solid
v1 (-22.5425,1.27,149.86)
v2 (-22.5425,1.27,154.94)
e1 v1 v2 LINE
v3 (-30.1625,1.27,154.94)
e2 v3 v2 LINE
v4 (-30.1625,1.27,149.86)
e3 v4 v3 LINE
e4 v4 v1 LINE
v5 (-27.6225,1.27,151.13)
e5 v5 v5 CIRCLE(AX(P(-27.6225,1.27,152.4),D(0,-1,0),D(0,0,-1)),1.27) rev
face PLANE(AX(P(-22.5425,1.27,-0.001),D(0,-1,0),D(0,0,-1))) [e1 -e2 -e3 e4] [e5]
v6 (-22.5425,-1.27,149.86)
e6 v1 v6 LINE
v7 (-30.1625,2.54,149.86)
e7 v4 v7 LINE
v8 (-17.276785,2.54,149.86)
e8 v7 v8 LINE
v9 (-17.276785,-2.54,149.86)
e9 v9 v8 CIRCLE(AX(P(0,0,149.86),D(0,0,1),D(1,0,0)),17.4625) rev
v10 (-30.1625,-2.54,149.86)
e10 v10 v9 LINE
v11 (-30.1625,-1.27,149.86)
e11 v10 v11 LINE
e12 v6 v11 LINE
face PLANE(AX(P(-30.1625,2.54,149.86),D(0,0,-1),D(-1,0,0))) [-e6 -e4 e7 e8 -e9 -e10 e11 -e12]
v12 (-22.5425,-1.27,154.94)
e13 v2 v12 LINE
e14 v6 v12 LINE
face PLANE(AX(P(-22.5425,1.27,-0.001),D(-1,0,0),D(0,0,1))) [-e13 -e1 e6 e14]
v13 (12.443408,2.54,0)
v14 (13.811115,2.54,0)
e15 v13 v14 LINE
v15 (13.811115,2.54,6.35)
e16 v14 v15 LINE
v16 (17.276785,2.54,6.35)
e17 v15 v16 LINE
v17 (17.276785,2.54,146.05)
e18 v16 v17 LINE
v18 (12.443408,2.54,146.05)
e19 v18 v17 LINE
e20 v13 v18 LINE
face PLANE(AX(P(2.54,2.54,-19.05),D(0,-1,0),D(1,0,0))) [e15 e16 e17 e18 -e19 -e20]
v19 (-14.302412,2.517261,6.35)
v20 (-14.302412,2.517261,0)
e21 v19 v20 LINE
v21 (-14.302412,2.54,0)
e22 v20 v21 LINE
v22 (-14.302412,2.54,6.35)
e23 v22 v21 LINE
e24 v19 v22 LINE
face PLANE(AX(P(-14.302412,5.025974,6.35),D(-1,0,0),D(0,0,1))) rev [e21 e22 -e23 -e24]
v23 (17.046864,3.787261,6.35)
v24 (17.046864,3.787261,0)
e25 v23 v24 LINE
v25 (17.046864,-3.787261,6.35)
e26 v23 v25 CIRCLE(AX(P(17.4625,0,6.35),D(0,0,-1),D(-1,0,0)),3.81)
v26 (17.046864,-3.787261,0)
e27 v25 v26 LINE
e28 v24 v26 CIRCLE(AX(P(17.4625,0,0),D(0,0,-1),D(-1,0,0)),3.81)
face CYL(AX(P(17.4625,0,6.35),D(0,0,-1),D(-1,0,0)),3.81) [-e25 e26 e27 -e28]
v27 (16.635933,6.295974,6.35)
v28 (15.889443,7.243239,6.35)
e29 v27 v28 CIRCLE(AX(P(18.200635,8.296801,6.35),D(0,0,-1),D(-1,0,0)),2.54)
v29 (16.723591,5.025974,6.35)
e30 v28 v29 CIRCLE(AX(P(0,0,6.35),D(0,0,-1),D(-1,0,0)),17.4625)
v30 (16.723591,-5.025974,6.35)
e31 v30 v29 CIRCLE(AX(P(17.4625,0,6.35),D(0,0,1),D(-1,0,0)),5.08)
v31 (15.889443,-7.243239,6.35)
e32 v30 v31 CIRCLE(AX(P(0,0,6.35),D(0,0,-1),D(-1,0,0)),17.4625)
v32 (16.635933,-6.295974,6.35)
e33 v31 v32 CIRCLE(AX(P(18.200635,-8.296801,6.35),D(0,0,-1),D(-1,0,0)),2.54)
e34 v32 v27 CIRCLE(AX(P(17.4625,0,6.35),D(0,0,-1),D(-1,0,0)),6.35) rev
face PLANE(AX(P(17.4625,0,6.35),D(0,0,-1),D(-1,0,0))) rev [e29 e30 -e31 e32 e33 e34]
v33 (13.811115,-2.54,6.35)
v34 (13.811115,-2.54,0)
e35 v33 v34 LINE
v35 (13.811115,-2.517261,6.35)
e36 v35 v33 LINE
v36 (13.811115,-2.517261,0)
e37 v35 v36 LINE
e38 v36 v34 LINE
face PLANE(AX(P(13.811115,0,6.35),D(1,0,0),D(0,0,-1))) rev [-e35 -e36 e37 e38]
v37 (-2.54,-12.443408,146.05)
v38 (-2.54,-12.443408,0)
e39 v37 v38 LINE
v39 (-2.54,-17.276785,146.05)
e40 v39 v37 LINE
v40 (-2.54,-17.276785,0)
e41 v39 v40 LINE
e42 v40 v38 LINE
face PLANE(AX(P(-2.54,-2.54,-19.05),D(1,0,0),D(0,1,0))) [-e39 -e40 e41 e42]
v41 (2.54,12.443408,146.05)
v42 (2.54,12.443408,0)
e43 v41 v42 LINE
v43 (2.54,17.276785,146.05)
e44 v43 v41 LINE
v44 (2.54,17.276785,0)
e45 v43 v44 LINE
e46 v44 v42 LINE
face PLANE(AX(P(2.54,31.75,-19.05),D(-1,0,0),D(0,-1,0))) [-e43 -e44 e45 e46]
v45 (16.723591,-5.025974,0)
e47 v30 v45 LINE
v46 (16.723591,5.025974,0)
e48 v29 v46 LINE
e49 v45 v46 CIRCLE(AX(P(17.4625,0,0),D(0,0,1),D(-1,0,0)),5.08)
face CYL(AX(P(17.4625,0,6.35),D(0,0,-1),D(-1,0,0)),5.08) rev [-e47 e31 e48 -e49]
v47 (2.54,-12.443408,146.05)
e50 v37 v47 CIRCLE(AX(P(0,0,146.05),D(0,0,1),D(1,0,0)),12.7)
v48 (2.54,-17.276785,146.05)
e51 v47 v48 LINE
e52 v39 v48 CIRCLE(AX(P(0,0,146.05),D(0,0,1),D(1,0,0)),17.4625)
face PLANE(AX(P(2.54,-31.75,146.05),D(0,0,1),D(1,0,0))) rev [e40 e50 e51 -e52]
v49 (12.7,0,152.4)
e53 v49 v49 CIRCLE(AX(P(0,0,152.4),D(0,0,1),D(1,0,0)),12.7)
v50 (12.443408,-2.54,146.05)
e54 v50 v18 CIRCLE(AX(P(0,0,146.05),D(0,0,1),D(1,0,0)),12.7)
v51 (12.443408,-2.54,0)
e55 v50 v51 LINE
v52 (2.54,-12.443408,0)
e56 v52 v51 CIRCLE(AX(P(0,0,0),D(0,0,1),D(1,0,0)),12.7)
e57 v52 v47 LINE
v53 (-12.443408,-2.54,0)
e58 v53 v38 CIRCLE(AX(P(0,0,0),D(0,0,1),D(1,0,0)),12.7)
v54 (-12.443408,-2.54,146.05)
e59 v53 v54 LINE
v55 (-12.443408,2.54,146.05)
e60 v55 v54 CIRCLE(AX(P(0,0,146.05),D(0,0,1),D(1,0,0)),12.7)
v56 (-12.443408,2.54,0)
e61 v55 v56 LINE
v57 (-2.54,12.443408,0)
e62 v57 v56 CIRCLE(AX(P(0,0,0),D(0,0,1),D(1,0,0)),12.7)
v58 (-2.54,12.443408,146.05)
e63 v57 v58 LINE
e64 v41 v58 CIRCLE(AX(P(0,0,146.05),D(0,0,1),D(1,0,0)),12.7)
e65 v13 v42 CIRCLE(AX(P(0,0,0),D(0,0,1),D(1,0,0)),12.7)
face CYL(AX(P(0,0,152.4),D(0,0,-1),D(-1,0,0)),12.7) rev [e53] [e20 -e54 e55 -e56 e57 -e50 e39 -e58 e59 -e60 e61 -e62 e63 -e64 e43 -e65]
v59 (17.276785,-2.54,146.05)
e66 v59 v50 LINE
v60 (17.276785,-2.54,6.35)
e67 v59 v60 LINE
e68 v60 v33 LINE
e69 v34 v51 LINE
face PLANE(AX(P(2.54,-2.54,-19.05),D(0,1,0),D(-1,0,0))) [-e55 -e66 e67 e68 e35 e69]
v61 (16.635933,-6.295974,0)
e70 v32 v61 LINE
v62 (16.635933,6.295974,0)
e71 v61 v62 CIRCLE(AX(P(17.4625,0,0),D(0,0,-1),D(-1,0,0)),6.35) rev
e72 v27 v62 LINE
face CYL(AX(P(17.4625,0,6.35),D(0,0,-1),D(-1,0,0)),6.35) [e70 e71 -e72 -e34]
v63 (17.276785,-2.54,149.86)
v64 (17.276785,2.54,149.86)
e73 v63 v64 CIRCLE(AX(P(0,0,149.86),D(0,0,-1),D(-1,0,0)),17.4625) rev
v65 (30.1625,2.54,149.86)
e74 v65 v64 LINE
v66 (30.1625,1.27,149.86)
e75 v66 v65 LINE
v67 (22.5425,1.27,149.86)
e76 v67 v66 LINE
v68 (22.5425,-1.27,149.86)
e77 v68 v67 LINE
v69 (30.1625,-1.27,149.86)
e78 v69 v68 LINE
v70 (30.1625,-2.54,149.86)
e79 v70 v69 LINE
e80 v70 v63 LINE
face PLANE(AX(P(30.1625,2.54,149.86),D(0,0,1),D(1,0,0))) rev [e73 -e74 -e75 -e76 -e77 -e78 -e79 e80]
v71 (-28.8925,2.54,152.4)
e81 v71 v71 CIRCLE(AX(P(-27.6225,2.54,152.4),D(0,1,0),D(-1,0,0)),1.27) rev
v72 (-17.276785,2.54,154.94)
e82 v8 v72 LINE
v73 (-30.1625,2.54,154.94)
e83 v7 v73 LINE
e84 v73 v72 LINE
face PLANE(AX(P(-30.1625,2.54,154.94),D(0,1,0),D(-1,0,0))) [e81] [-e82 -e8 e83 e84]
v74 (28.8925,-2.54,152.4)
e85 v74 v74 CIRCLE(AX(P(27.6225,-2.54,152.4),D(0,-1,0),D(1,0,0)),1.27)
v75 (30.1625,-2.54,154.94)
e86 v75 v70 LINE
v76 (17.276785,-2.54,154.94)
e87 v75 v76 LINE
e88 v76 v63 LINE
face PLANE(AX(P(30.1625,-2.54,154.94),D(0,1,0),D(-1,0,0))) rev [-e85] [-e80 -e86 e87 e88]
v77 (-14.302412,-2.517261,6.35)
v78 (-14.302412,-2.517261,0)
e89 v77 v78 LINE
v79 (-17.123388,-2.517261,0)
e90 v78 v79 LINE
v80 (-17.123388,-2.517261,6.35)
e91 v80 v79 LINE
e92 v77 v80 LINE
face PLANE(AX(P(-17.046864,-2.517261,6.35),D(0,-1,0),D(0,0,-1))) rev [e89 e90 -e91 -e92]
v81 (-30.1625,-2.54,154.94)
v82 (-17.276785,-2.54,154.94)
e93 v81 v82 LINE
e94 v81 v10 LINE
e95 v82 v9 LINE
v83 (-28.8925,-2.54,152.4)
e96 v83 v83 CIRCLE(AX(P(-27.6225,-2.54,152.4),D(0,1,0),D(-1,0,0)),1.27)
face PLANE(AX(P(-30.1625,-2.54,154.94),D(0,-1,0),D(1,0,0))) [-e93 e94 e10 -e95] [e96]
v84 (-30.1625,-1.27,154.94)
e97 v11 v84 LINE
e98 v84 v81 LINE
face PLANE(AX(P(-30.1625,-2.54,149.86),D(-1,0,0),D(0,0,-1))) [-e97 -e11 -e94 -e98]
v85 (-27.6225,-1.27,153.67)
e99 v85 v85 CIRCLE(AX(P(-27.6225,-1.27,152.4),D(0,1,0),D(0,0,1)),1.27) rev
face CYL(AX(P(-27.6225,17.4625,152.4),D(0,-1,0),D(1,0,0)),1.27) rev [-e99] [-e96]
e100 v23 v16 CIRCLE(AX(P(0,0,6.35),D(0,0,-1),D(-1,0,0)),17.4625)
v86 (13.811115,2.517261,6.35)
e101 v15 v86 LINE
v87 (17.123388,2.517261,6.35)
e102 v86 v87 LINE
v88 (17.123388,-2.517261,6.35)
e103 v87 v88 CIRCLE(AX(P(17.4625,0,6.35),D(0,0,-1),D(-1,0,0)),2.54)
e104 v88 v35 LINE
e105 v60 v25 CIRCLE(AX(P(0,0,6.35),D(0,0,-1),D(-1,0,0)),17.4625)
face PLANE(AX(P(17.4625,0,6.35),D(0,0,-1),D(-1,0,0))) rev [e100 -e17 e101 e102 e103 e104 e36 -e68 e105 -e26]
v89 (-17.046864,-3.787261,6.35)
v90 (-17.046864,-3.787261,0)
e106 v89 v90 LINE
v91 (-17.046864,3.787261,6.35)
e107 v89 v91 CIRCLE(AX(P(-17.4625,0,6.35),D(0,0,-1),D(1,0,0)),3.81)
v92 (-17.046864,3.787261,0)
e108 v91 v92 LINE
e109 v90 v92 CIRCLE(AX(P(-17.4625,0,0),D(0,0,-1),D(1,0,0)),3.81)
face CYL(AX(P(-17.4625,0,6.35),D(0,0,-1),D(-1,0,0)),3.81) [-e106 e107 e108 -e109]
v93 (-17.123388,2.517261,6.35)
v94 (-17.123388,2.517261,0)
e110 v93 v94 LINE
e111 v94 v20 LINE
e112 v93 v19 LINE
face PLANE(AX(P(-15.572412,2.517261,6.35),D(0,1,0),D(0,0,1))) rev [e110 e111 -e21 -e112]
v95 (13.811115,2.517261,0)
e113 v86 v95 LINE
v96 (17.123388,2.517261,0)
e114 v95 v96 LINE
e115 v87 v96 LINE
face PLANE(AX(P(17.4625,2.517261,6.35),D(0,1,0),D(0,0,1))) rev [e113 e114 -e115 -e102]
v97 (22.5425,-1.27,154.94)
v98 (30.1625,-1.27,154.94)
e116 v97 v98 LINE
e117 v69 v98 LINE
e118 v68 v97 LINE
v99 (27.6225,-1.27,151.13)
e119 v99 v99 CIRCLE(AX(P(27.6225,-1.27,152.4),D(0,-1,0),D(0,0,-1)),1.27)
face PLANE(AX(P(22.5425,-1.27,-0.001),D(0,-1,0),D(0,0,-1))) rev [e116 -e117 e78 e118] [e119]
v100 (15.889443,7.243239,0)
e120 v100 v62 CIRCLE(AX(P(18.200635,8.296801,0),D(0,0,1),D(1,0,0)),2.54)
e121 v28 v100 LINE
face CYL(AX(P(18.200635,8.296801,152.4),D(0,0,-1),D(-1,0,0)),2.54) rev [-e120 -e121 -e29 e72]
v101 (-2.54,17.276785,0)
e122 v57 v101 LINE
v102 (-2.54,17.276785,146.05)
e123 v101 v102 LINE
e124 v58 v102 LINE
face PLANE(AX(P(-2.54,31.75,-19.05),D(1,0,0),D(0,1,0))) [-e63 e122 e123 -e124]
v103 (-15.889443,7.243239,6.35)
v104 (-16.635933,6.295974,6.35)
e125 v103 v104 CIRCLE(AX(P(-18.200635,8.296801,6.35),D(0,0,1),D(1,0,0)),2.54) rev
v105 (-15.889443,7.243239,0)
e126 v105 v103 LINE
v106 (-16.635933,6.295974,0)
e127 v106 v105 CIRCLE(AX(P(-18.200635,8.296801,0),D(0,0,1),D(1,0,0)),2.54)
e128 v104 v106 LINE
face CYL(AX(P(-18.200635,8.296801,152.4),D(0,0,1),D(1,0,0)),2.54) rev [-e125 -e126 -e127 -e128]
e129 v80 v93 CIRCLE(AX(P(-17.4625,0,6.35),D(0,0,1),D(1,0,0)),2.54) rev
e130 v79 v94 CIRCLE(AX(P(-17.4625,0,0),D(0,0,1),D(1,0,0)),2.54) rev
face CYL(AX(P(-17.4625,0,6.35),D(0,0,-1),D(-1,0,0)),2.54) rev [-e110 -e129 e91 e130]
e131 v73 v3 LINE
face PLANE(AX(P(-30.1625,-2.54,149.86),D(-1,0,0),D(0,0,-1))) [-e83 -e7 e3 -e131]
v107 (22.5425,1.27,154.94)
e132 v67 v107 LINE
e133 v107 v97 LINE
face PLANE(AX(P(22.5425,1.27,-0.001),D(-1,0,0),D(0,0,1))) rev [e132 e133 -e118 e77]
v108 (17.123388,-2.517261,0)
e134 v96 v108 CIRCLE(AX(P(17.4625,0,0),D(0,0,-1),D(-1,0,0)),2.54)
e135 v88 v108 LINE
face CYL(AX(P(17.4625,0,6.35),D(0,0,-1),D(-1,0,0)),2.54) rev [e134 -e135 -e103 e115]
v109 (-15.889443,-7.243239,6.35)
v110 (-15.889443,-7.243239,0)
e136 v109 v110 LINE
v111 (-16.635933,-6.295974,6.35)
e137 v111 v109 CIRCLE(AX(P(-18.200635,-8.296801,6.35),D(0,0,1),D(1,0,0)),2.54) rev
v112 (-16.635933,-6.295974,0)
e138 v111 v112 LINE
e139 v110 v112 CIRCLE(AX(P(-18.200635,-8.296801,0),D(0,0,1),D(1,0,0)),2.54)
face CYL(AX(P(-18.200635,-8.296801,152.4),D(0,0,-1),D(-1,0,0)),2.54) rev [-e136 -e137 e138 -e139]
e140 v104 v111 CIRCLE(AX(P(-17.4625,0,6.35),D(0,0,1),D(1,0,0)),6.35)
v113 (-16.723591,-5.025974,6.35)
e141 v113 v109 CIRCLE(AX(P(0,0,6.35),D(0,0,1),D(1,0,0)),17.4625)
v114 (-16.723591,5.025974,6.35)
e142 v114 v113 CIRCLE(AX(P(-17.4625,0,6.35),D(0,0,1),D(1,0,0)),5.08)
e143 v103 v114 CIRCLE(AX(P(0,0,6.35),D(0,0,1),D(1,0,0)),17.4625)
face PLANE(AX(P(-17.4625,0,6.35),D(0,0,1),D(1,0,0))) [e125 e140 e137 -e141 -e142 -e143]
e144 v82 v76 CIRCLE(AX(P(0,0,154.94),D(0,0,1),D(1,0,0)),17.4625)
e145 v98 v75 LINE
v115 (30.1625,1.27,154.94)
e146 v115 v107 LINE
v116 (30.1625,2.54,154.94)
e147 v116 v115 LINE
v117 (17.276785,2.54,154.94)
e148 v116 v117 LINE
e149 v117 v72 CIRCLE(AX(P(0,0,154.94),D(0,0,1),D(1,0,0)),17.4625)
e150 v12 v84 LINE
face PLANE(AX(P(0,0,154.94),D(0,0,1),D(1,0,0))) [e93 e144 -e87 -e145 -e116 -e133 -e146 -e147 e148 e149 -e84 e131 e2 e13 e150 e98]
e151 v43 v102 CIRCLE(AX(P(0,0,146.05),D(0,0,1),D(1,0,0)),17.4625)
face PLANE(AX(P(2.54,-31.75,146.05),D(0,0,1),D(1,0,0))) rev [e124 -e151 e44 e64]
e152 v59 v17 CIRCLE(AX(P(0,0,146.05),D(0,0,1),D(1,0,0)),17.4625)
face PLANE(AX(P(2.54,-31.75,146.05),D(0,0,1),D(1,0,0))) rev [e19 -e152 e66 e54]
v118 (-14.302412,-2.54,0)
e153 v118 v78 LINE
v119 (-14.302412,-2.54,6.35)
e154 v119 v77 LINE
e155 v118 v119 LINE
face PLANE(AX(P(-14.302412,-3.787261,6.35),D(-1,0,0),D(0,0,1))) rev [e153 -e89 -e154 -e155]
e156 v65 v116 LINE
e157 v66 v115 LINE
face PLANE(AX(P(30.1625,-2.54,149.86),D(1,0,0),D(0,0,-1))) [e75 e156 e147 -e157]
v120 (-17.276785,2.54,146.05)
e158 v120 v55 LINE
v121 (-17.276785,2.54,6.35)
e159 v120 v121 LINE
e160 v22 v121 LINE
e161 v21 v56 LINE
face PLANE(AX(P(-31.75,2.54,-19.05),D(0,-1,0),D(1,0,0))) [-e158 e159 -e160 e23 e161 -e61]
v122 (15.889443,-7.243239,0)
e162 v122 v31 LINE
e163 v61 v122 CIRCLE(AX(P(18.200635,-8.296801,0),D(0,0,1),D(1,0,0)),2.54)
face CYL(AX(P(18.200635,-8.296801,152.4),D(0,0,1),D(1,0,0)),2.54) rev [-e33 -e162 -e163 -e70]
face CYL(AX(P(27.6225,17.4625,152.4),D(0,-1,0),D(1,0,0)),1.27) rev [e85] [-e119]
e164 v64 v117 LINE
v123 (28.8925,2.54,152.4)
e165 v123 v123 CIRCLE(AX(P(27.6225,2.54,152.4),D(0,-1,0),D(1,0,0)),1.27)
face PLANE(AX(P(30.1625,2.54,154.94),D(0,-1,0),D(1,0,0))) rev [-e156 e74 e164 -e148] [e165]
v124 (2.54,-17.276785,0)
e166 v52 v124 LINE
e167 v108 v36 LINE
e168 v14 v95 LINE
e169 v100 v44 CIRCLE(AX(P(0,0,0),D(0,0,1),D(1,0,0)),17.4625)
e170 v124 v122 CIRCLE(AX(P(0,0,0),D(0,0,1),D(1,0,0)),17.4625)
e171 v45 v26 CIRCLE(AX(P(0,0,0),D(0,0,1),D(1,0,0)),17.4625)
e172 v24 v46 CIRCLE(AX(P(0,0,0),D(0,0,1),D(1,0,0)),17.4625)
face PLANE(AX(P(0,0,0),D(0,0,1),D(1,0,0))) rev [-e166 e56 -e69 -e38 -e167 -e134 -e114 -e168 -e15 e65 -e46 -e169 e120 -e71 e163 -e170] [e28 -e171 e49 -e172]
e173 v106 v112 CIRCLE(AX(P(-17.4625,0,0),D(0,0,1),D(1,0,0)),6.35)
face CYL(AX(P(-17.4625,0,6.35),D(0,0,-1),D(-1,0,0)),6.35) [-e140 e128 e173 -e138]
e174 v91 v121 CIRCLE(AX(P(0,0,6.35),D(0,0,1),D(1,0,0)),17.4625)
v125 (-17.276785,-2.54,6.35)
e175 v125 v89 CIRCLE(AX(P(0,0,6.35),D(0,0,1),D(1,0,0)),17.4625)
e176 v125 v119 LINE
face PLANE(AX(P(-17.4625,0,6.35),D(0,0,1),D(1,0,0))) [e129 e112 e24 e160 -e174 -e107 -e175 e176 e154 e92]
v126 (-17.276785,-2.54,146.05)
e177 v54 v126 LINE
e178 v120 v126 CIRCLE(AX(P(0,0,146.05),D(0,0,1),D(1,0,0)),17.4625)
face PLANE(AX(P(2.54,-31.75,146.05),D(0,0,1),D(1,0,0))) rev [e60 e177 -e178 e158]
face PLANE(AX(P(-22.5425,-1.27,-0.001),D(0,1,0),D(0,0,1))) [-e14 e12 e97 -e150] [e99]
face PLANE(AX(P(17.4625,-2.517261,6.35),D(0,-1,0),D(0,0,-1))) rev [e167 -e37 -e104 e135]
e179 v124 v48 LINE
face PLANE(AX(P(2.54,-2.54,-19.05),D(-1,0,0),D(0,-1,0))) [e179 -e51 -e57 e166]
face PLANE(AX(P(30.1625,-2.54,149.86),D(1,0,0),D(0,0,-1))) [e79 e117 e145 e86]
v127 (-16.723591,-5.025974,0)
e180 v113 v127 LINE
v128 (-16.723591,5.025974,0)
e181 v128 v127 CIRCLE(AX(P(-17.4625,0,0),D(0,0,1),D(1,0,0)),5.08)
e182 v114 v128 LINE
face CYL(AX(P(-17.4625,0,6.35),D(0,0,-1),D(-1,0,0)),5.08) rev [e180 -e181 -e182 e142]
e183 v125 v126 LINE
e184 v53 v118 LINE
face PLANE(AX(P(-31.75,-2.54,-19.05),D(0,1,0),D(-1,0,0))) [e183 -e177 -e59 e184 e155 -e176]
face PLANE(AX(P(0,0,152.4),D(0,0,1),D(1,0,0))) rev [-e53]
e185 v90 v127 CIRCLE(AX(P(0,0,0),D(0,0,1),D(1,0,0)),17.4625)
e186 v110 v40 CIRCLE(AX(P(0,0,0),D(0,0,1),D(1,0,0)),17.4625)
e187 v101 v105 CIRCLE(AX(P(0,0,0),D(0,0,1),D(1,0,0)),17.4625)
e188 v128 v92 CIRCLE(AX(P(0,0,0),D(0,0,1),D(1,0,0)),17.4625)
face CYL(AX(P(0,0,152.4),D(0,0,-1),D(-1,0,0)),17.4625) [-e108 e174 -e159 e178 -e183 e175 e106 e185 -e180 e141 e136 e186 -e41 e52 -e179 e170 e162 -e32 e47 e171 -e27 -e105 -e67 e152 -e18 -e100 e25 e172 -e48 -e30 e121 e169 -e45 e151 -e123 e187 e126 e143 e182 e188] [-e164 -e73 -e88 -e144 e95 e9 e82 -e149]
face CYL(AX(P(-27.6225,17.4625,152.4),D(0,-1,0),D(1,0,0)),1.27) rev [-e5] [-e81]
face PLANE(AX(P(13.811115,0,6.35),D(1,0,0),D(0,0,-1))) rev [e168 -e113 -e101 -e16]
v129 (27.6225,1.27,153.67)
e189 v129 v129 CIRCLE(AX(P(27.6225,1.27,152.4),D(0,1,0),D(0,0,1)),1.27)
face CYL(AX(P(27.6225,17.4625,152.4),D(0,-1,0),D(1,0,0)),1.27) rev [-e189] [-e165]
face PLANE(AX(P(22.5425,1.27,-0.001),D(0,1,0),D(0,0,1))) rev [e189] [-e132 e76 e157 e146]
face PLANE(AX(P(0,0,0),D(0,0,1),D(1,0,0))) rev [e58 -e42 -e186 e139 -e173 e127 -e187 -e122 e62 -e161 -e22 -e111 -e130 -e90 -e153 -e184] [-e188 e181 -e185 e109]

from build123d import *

# Parameters (mm, degrees)
SKETCH1_R               = 17.4625
SKETCH1_R_2             = 12.7
EXTRUDE_THIN1_DEPTH     = 152.4
CUT_EXTRUDE1_DEPTH      = 25.4
CUT_EXTRUDE1_DEPTH_BACK = 139.7
EXTRUDE_THIN2_DEPTH     = 6.35
SKETCH4_R               = 17.4625
BOSS_EXTRUDE1_DEPTH     = 2.54
FILLET1_R               = 2.54
BOSS_EXTRUDE2_START     = -0.185715
SKETCH5_W               = 5.08
SKETCH5_H               = 5.08
BOSS_EXTRUDE2_DEPTH     = 12.885715
CUT_EXTRUDE2_REACH      = 160.812
SKETCH6_W               = 7.62
SKETCH6_H               = 2.54
SKETCH7_R               = 1.27
CUT_EXTRUDE3_DEPTH      = 160.110904757


# Read off the part's stored shape, not the designer's step: Extrude-Thin2
with BuildPart() as part:
    # Sketch1 → Extrude-Thin1 (new body)
    with BuildSketch(Plane.XY):
        Circle(SKETCH1_R)
        Circle(SKETCH1_R_2, mode=Mode.SUBTRACT)
    extrude(amount=EXTRUDE_THIN1_DEPTH)

    # Sketch2 → Cut-Extrude1 (cut, two sides: drawn at the far end of the back side and taken through both)
    with BuildSketch(Plane(origin=(0, 0, 6.35), x_dir=(-1, 0, 0), z_dir=(0, 0, -1)).offset(-CUT_EXTRUDE1_DEPTH_BACK)):
        Polygon((-2.54, 2.54), (-31.75, 2.54), (-31.75, -2.54), (-2.54, -2.54), (-2.54, -31.75), (2.54, -31.75), (2.54, -2.54), (31.75, -2.54), (31.75, 2.54), (2.54, 2.54), (2.54, 31.75), (-2.54, 31.75), align=None)
    extrude(amount=CUT_EXTRUDE1_DEPTH + CUT_EXTRUDE1_DEPTH_BACK, mode=Mode.SUBTRACT)

    # Extrude-Thin2 outline → Extrude-Thin2 (add)
    with BuildSketch(Plane.XY):
        with BuildLine():
            Line((13.81111464, 2.51726107), (17.123388359, 2.51726107))
            ThreePointArc((17.123388359, 2.51726107), (20.0025, 0), (17.123388359, -2.51726107))
            Line((17.123388359, -2.51726107), (13.81111464, -2.51726107))
            Line((13.81111464, -2.51726107), (13.81111464, -2.54))
            Line((13.81111464, -2.54), (17.276785183, -2.54))
            ThreePointArc((17.276785183, -2.54), (17.17315149, -3.165718582), (17.046863636, -3.78726107))
            ThreePointArc((17.046863636, -3.78726107), (21.2725, 0), (17.046863636, 3.78726107))
            ThreePointArc((17.046863636, 3.78726107), (17.17315149, 3.165718582), (17.276785183, 2.54))
            Line((17.276785183, 2.54), (13.81111464, 2.54))
            Line((13.81111464, 2.54), (13.81111464, 2.51726107))
        make_face()
        with BuildLine():
            ThreePointArc((16.288020729, 6.295973871), (16.518015944, 5.665161561), (16.723590909, 5.025973871))
            ThreePointArc((16.723590909, 5.025973871), (22.5425, 0), (16.723590909, -5.025973871))
            ThreePointArc((16.723590909, -5.025973871), (16.518015944, -5.665161561), (16.288020729, -6.295973871))
            Line((16.288020729, -6.295973871), (16.635932996, -6.295973871))
            ThreePointArc((16.635932996, -6.295973871), (23.8125, 0), (16.635932996, 6.295973871))
            Line((16.635932996, 6.295973871), (16.288020729, 6.295973871))
        make_face()
        with BuildLine():
            ThreePointArc((-16.723590909, 5.025973871), (-16.518015944, 5.665161561), (-16.288020729, 6.295973871))
            Line((-16.288020729, 6.295973871), (-16.635932996, 6.295973871))
            ThreePointArc((-16.635932996, 6.295973871), (-23.8125, 0), (-16.635932996, -6.295973871))
            Line((-16.635932996, -6.295973871), (-16.288020729, -6.295973871))
            ThreePointArc((-16.288020729, -6.295973871), (-16.518015944, -5.665161561), (-16.723590909, -5.025973871))
            ThreePointArc((-16.723590909, -5.025973871), (-22.5425, 0), (-16.723590909, 5.025973871))
        make_face()
        with BuildLine():
            ThreePointArc((-17.276785183, 2.54), (-17.17315149, 3.165718582), (-17.046863636, 3.78726107))
            ThreePointArc((-17.046863636, 3.78726107), (-21.2725, 0), (-17.046863636, -3.78726107))
            ThreePointArc((-17.046863636, -3.78726107), (-17.17315149, -3.165718582), (-17.276785183, -2.54))
            Line((-17.276785183, -2.54), (-14.302412139, -2.54))
            Line((-14.302412139, -2.54), (-14.302412139, -2.51726107))
            Line((-14.302412139, -2.51726107), (-17.123388359, -2.51726107))
            ThreePointArc((-17.123388359, -2.51726107), (-20.0025, 0), (-17.123388359, 2.51726107))
            Line((-17.123388359, 2.51726107), (-14.302412139, 2.51726107))
            Line((-14.302412139, 2.51726107), (-14.302412139, 2.54))
            Line((-14.302412139, 2.54), (-17.276785183, 2.54))
        make_face()
    extrude(amount=EXTRUDE_THIN2_DEPTH)

    # Sketch4 → Boss-Extrude1 (add)
    with BuildSketch(Plane.XY.offset(152.4)):
        with Locations(Location((0, 0, 0), (0, 0, 171.636398211))):
            Circle(SKETCH4_R)
    extrude(amount=BOSS_EXTRUDE1_DEPTH)

    # Fillet1
    # the kernel refuses this fillet: 2.54 mm, written as the material it adds along each edge
    with BuildSketch(Plane(origin=(-16.288020729, -6.295973871, 0), x_dir=(0.3878333084832039, -0.9217295291087142, 0), z_dir=(0, 0, 1)), Plane(origin=(16.288020729, 6.295973871, 0), x_dir=(-0.38783330848320335, 0.9217295291087143, 0), z_dir=(0, 0, 1))) as fillet1_piece_1:
        with BuildLine():
            CenterArc((1.10244597, -2.53890008), FILLET1_R, 91.686230358, 27.467637925)
            Line((-0.134931966, -0.32068101), (-0.159679524, -0.276316629))
            ThreePointArc((-0.159679524, -0.276316629), (-0.114289843, -0.140638573), (-0.04682386, 0.019701932))
            Line((-0.04682386, 0.019701932), (0.001494842, 0.050778002))
            ThreePointArc((0.001494842, 0.050778002), (0.513851935, 0.043238053), (1.026209029, 0.050778002))
            Line((1.026209029, 0.050778002), (1.027703871, 0))
        make_face()
    extrude(amount=6.35)
    with BuildSketch(Plane(origin=(-16.288020729, 6.295973871, 0), x_dir=(0.38783330848320663, 0.9217295291087131, 0), z_dir=(0, 0, 1)), Plane(origin=(16.288020729, -6.295973871, 0), x_dir=(-0.3878333084832061, -0.9217295291087134, 0), z_dir=(0, 0, 1))) as fillet1_piece_2:
        with BuildLine():
            CenterArc((1.10244597, 2.53890008), FILLET1_R, 240.846131717, 27.467637925)
            Line((-0.134931966, 0.32068101), (-0.159679524, 0.276316629))
            ThreePointArc((-0.159679524, 0.276316629), (-0.114289843, 0.140638573), (-0.04682386, -0.019701932))
            Line((-0.04682386, -0.019701932), (0.001494842, -0.050778002))
            ThreePointArc((0.001494842, -0.050778002), (0.513851935, -0.043238053), (1.026209029, -0.050778002))
            Line((1.026209029, -0.050778002), (1.027703871, 0))
        make_face()
    extrude(amount=6.35)

    # Sketch5 → Boss-Extrude2 (add)
    with BuildSketch(Plane(origin=(17.4625, 0, 146.05), x_dir=(0, 0, -1), z_dir=(1, 0, 0)).offset(BOSS_EXTRUDE2_START)):
        with Locations((-6.35, 0)):
            Rectangle(SKETCH5_W, SKETCH5_H)
    boss_extrude2 = extrude(amount=BOSS_EXTRUDE2_DEPTH)

    # Sketch6 → Cut-Extrude2 (cut, up to next)
    with BuildSketch(Plane.XY.offset(154.94), mode=Mode.PRIVATE) as cut_extrude2_sk1:
        with Locations((26.3525, 0)):
            Rectangle(SKETCH6_W, SKETCH6_H)
    cut_extrude2_tool1 = extrude(cut_extrude2_sk1.sketch, amount=-CUT_EXTRUDE2_REACH, mode=Mode.PRIVATE) & part.part
    cut_extrude2 = cut_extrude2_tool1.solids().sort_by_distance((26.3525, 0, 154.94))[0]
    add(cut_extrude2, mode=Mode.SUBTRACT)

    # Sketch7 → Cut-Extrude3 (cut, through all)
    with BuildSketch(Plane.XZ.offset(2.54)):
        with Locations((27.6225, 152.4)):
            Circle(SKETCH7_R)
    cut_extrude3 = extrude(amount=-CUT_EXTRUDE3_DEPTH, mode=Mode.SUBTRACT)

    # Mirror2: Boss-Extrude2, Cut-Extrude2, Cut-Extrude3 across plane
    add(boss_extrude2.mirror(Plane(origin=(0, 0, 0), x_dir=(0, 0, 1), z_dir=(1, 0, 0))))
    add(cut_extrude2.mirror(Plane(origin=(0, 0, 0), x_dir=(0, 0, 1), z_dir=(1, 0, 0))), mode=Mode.SUBTRACT)
    add(cut_extrude3.mirror(Plane(origin=(0, 0, 0), x_dir=(0, 0, 1), z_dir=(1, 0, 0))), mode=Mode.SUBTRACT)


solid = part.part
